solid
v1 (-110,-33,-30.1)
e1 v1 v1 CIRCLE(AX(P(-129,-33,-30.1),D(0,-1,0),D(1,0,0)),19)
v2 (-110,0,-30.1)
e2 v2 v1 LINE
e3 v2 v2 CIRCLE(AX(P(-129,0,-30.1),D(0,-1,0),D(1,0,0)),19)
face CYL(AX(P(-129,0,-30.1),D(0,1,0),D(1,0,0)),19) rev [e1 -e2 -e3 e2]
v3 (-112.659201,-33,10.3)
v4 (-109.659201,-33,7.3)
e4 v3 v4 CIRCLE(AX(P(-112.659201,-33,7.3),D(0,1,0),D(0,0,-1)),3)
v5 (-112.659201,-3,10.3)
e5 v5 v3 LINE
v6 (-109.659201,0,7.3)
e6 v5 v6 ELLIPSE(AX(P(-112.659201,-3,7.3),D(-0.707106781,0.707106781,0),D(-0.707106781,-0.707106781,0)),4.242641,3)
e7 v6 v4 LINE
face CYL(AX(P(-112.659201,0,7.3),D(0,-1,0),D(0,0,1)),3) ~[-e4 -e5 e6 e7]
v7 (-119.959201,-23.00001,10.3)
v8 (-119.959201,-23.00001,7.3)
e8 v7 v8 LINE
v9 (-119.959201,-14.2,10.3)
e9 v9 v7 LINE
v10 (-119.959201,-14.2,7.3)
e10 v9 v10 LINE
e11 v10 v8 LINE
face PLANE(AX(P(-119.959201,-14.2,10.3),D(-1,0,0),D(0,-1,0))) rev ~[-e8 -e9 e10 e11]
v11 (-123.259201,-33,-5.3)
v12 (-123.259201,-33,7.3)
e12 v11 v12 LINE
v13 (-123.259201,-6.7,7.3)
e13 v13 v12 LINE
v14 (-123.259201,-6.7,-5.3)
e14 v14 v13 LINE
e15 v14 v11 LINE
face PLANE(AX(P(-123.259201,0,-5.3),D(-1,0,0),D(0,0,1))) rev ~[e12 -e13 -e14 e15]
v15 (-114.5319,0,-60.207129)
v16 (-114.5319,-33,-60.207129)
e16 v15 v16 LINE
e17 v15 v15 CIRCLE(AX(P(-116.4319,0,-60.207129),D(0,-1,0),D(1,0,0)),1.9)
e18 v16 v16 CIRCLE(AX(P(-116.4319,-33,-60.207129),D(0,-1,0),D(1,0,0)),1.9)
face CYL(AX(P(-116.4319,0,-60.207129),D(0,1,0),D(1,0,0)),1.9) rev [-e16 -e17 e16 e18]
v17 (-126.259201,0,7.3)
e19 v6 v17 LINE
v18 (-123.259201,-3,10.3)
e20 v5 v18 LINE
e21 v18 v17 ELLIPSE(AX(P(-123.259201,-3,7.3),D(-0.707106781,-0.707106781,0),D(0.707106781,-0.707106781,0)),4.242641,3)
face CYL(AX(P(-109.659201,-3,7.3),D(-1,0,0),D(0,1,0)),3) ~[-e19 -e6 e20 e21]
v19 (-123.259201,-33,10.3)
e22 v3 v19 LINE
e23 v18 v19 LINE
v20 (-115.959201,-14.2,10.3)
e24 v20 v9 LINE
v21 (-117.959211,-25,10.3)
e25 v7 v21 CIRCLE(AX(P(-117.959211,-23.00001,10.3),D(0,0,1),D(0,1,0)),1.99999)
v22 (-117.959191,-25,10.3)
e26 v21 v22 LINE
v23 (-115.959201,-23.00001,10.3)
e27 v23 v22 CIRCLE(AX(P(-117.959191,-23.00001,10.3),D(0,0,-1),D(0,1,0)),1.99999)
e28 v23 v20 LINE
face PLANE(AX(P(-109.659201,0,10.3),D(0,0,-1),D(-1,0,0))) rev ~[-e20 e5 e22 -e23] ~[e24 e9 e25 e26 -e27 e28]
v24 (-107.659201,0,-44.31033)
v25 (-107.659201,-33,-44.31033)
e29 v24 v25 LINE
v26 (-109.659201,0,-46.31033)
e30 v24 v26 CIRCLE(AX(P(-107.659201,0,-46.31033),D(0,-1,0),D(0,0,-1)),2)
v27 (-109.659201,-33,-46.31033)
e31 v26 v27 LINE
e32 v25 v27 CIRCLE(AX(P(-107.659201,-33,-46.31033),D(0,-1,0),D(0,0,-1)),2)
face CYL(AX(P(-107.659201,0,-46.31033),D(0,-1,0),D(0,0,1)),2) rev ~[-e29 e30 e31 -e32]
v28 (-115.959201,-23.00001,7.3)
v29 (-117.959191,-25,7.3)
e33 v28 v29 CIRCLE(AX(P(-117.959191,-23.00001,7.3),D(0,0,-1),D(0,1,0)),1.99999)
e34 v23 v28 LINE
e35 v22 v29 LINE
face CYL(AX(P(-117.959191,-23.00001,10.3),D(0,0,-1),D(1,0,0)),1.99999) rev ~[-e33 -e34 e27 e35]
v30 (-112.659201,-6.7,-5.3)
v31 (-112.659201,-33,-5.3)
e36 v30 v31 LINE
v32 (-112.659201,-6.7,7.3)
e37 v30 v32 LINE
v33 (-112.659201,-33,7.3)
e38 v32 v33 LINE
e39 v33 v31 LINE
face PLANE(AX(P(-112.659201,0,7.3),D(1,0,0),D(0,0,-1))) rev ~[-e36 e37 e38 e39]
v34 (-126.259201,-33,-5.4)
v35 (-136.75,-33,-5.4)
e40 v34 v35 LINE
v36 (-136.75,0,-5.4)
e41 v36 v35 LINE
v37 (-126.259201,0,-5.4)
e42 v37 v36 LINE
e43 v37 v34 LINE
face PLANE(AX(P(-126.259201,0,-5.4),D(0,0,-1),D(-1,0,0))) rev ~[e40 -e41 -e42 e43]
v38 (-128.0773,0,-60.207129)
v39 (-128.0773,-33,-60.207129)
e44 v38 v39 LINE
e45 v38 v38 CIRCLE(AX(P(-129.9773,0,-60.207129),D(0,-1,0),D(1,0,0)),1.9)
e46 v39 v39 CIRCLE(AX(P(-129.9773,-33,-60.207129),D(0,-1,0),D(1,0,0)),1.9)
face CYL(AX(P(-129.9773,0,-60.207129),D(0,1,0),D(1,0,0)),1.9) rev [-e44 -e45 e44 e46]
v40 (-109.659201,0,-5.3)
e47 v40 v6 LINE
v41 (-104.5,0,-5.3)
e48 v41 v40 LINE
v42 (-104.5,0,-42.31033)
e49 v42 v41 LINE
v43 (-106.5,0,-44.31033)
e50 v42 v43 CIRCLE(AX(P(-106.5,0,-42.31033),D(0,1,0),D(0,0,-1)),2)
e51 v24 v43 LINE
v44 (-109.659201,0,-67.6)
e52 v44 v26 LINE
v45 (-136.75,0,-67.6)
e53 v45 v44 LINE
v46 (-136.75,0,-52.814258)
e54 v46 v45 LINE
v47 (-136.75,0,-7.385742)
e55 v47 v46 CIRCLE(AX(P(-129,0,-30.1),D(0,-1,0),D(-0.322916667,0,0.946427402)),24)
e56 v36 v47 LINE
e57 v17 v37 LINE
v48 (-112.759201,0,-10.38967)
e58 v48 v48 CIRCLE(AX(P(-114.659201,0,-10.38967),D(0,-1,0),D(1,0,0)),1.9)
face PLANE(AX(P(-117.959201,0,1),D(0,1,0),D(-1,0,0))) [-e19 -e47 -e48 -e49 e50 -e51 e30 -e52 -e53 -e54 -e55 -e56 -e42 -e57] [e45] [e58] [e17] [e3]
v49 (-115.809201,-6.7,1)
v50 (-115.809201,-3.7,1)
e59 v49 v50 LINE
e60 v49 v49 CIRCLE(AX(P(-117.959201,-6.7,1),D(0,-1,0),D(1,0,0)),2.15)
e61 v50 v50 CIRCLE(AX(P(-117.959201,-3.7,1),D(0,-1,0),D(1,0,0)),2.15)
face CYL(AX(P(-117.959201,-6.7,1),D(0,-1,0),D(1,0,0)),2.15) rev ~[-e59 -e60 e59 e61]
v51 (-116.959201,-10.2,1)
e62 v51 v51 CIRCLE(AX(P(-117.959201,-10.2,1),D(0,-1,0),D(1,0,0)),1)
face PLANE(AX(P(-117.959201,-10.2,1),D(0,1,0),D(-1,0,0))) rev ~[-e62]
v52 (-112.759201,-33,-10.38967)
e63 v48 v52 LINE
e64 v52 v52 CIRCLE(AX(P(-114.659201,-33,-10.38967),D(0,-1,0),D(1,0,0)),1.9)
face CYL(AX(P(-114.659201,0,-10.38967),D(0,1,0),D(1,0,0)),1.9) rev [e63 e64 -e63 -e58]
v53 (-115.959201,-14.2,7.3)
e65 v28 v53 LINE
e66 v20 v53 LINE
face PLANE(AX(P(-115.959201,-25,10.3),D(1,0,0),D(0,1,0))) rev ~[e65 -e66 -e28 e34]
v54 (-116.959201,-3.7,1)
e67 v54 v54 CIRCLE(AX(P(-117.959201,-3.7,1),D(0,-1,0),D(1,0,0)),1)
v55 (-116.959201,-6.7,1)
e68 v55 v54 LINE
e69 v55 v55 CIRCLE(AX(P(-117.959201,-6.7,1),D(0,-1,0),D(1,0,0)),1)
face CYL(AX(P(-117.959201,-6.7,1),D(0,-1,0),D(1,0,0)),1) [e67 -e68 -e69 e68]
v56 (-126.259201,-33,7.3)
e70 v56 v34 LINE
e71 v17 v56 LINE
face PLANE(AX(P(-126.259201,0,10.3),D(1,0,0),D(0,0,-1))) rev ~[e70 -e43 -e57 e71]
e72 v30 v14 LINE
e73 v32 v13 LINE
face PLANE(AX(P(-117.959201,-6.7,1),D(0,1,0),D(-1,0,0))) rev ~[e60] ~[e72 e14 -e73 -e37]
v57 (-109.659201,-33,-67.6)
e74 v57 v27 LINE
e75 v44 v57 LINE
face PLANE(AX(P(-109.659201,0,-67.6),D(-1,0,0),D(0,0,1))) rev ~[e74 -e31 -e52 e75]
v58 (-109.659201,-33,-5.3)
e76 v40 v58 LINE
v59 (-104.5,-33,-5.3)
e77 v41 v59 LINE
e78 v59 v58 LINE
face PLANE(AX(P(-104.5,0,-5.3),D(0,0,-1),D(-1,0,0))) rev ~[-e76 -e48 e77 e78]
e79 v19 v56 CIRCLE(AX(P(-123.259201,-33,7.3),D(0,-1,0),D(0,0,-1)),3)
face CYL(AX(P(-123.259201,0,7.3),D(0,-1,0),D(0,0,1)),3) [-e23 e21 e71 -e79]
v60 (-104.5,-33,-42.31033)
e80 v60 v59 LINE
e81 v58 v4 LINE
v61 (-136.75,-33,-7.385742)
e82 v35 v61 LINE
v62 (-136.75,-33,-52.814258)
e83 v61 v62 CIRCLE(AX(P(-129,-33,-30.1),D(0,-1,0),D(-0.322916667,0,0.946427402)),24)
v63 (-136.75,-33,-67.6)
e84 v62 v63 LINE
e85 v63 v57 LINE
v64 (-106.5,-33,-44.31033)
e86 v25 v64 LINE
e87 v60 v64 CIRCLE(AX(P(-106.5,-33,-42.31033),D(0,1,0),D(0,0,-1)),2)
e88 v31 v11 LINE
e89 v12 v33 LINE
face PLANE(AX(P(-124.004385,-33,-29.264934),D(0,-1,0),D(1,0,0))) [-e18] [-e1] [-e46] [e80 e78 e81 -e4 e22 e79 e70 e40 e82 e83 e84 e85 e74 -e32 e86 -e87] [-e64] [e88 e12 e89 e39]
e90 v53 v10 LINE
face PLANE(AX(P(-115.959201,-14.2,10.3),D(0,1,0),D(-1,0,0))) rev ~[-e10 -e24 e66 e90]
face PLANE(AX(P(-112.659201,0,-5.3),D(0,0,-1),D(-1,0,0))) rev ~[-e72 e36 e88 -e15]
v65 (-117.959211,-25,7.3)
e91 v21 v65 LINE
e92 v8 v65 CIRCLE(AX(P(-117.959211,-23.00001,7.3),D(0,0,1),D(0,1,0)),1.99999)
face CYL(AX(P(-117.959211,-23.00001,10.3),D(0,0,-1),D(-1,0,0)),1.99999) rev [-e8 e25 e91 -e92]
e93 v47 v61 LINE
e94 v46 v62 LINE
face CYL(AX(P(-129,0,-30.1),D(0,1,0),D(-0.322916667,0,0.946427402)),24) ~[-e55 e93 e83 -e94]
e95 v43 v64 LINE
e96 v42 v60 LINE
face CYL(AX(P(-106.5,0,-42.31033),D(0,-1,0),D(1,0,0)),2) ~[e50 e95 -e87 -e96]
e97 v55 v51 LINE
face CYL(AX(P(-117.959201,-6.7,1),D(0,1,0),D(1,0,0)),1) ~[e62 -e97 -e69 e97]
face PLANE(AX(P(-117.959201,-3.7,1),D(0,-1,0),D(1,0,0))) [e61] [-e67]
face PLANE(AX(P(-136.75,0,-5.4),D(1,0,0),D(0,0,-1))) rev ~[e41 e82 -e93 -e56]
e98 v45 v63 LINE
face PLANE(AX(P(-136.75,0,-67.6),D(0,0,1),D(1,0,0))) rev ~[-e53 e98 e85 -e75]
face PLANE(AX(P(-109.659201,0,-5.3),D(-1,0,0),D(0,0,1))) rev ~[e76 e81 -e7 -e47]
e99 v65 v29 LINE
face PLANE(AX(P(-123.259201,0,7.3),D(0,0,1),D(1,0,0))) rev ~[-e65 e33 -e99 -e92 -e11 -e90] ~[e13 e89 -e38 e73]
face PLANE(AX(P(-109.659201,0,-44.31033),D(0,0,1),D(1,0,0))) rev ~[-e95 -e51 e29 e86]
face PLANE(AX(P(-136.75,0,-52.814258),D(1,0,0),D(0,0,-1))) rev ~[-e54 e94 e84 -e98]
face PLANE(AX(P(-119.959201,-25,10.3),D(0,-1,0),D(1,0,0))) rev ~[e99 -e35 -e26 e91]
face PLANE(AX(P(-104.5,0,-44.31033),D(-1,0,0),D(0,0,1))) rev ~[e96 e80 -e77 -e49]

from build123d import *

# Parameters (mm, degrees)
F0_R      = 1.9
F0_R_2    = 19
F1_DEPTH  = 33
F2_W      = 10.6
F2_H      = 12.6
F3_DEPTH  = 6.7
F4_R      = 3
F5_R      = 2
F7_DEPTH  = 8.5
F8_R      = 1.99999
F9_R      = 2.15
F9_R_2    = 1
F10_DEPTH = 3
F11_DEPTH = 3.5


# Not quite as in the source:
# - a fillet or chamfer is up to 0.001 mm smaller than in the source, because OpenCascade refuses the exact size


with BuildPart() as f1:
    # F0 (on Front) → F1 (new body)
    with BuildSketch(Plane.XZ):
        with BuildLine():
            Line((-109.659200659, 0), (-109.659200659, 10.3))
            Line((-109.659200659, 10.3), (-126.259200659, 10.3))
            Line((-126.259200659, 10.3), (-126.259200659, 0))
            Line((-126.259200659, 0), (-126.259200659, -5))
            Line((-126.259200659, -5), (-126.259200659, -5.4))
            Line((-126.259200659, -5.4), (-136.75, -5.4))
            Line((-136.75, -5.4), (-136.75, -7.385742363))
            ThreePointArc((-136.75, -7.385742363), (-153, -30.1), (-136.75, -52.814257637))
            Line((-136.75, -52.814257637), (-136.75, -67.6))
            Line((-136.75, -67.6), (-132.812420773, -67.6))
            Line((-132.812420773, -67.6), (-109.659200659, -67.6))
            Line((-109.659200659, -67.6), (-109.659200659, -44.3103300754))
            Line((-109.659200659, -44.3103300754), (-105, -44.3103300754))
            Line((-105, -44.3103300754), (-104.5, -44.3103300754))
            Line((-104.5, -44.3103300754), (-104.5, -5.3))
            Line((-104.5, -5.3), (-105, -5.3))
            Line((-105, -5.3), (-109.659200659, -5.3))
            Line((-109.659200659, -5.3), (-109.659200659, 0))
        make_face()
        with Locations((-129.9773001648, -60.2071288185)):
            Circle(F0_R, mode=Mode.SUBTRACT)
        with Locations((-129, -30.1)):
            Circle(F0_R_2, mode=Mode.SUBTRACT)
        with Locations((-116.4319004943, -60.2071288185)):
            Circle(F0_R, mode=Mode.SUBTRACT)
        with Locations((-114.659200659, -10.3896699246)):
            Circle(F0_R, mode=Mode.SUBTRACT)
        Polygon((-112.659200659, -5.3), (-117.959200659, -5.3), (-123.259200659, -5.3), (-123.259200659, 7.3), (-112.659200659, 7.3), align=None, mode=Mode.SUBTRACT)
    extrude(amount=F1_DEPTH)

    # F2 (on face) → F3 (join)
    with BuildSketch(Plane(origin=(0, 0, 0), x_dir=(-1, 0, 0), z_dir=(0, 1, 0))):
        with Locations((117.959200659, 1)):
            Rectangle(F2_W, F2_H)
    extrude(amount=-F3_DEPTH)

    # F4
    f4_edges = [f1.edges().sort_by_distance(p)[0] for p in [
        (-109.659201, -16.5, 10.3),
        (-126.259201, -16.5, 10.3),
        (-117.959201, 0, 10.3),
    ]]
    fillet(f4_edges, radius=F4_R)

    # F5
    f5_edges = [f1.edges().sort_by_distance(p)[0] for p in [
        (-104.5, -16.5, -44.31033),
        (-109.659201, -16.5, -44.31033),
    ]]
    fillet(f5_edges, radius=F5_R)

    # F6 (on face) → F7 (cut)
    with BuildSketch(Plane.XY.offset(10.3)):
        Polygon((-119.959200659, -25), (-117.959200659, -25), (-115.959200659, -25), (-115.959200659, -14.2), (-119.959200659, -14.2), align=None)
    extrude(amount=-F7_DEPTH, mode=Mode.SUBTRACT)

    # F8 (radius 2 in the source; OpenCascade refuses exactly that, so slightly less here)
    f8_edges = [f1.edges().sort_by_distance(p)[0] for p in [
        (-119.959201, -25, 8.8),
        (-115.959201, -25, 8.8),
    ]]
    fillet(f8_edges, radius=F8_R)

    # F9 (on face) → F10 (cut)
    with BuildSketch(Plane.XZ.offset(6.7)):
        with Locations((-117.959200659, 1)):
            Circle(F9_R)
        with Locations((-117.959200659, 1)):
            Circle(F9_R_2, mode=Mode.SUBTRACT)
    extrude(amount=-F10_DEPTH, mode=Mode.SUBTRACT)

    # F11 (add): a face of the model
    f11_faces = [f1.faces().sort_by_distance(p)[0] for p in [
        (-117.959200659, -6.7, 1),
    ]]
    extrude(f11_faces, amount=F11_DEPTH)


solid = f1.part
